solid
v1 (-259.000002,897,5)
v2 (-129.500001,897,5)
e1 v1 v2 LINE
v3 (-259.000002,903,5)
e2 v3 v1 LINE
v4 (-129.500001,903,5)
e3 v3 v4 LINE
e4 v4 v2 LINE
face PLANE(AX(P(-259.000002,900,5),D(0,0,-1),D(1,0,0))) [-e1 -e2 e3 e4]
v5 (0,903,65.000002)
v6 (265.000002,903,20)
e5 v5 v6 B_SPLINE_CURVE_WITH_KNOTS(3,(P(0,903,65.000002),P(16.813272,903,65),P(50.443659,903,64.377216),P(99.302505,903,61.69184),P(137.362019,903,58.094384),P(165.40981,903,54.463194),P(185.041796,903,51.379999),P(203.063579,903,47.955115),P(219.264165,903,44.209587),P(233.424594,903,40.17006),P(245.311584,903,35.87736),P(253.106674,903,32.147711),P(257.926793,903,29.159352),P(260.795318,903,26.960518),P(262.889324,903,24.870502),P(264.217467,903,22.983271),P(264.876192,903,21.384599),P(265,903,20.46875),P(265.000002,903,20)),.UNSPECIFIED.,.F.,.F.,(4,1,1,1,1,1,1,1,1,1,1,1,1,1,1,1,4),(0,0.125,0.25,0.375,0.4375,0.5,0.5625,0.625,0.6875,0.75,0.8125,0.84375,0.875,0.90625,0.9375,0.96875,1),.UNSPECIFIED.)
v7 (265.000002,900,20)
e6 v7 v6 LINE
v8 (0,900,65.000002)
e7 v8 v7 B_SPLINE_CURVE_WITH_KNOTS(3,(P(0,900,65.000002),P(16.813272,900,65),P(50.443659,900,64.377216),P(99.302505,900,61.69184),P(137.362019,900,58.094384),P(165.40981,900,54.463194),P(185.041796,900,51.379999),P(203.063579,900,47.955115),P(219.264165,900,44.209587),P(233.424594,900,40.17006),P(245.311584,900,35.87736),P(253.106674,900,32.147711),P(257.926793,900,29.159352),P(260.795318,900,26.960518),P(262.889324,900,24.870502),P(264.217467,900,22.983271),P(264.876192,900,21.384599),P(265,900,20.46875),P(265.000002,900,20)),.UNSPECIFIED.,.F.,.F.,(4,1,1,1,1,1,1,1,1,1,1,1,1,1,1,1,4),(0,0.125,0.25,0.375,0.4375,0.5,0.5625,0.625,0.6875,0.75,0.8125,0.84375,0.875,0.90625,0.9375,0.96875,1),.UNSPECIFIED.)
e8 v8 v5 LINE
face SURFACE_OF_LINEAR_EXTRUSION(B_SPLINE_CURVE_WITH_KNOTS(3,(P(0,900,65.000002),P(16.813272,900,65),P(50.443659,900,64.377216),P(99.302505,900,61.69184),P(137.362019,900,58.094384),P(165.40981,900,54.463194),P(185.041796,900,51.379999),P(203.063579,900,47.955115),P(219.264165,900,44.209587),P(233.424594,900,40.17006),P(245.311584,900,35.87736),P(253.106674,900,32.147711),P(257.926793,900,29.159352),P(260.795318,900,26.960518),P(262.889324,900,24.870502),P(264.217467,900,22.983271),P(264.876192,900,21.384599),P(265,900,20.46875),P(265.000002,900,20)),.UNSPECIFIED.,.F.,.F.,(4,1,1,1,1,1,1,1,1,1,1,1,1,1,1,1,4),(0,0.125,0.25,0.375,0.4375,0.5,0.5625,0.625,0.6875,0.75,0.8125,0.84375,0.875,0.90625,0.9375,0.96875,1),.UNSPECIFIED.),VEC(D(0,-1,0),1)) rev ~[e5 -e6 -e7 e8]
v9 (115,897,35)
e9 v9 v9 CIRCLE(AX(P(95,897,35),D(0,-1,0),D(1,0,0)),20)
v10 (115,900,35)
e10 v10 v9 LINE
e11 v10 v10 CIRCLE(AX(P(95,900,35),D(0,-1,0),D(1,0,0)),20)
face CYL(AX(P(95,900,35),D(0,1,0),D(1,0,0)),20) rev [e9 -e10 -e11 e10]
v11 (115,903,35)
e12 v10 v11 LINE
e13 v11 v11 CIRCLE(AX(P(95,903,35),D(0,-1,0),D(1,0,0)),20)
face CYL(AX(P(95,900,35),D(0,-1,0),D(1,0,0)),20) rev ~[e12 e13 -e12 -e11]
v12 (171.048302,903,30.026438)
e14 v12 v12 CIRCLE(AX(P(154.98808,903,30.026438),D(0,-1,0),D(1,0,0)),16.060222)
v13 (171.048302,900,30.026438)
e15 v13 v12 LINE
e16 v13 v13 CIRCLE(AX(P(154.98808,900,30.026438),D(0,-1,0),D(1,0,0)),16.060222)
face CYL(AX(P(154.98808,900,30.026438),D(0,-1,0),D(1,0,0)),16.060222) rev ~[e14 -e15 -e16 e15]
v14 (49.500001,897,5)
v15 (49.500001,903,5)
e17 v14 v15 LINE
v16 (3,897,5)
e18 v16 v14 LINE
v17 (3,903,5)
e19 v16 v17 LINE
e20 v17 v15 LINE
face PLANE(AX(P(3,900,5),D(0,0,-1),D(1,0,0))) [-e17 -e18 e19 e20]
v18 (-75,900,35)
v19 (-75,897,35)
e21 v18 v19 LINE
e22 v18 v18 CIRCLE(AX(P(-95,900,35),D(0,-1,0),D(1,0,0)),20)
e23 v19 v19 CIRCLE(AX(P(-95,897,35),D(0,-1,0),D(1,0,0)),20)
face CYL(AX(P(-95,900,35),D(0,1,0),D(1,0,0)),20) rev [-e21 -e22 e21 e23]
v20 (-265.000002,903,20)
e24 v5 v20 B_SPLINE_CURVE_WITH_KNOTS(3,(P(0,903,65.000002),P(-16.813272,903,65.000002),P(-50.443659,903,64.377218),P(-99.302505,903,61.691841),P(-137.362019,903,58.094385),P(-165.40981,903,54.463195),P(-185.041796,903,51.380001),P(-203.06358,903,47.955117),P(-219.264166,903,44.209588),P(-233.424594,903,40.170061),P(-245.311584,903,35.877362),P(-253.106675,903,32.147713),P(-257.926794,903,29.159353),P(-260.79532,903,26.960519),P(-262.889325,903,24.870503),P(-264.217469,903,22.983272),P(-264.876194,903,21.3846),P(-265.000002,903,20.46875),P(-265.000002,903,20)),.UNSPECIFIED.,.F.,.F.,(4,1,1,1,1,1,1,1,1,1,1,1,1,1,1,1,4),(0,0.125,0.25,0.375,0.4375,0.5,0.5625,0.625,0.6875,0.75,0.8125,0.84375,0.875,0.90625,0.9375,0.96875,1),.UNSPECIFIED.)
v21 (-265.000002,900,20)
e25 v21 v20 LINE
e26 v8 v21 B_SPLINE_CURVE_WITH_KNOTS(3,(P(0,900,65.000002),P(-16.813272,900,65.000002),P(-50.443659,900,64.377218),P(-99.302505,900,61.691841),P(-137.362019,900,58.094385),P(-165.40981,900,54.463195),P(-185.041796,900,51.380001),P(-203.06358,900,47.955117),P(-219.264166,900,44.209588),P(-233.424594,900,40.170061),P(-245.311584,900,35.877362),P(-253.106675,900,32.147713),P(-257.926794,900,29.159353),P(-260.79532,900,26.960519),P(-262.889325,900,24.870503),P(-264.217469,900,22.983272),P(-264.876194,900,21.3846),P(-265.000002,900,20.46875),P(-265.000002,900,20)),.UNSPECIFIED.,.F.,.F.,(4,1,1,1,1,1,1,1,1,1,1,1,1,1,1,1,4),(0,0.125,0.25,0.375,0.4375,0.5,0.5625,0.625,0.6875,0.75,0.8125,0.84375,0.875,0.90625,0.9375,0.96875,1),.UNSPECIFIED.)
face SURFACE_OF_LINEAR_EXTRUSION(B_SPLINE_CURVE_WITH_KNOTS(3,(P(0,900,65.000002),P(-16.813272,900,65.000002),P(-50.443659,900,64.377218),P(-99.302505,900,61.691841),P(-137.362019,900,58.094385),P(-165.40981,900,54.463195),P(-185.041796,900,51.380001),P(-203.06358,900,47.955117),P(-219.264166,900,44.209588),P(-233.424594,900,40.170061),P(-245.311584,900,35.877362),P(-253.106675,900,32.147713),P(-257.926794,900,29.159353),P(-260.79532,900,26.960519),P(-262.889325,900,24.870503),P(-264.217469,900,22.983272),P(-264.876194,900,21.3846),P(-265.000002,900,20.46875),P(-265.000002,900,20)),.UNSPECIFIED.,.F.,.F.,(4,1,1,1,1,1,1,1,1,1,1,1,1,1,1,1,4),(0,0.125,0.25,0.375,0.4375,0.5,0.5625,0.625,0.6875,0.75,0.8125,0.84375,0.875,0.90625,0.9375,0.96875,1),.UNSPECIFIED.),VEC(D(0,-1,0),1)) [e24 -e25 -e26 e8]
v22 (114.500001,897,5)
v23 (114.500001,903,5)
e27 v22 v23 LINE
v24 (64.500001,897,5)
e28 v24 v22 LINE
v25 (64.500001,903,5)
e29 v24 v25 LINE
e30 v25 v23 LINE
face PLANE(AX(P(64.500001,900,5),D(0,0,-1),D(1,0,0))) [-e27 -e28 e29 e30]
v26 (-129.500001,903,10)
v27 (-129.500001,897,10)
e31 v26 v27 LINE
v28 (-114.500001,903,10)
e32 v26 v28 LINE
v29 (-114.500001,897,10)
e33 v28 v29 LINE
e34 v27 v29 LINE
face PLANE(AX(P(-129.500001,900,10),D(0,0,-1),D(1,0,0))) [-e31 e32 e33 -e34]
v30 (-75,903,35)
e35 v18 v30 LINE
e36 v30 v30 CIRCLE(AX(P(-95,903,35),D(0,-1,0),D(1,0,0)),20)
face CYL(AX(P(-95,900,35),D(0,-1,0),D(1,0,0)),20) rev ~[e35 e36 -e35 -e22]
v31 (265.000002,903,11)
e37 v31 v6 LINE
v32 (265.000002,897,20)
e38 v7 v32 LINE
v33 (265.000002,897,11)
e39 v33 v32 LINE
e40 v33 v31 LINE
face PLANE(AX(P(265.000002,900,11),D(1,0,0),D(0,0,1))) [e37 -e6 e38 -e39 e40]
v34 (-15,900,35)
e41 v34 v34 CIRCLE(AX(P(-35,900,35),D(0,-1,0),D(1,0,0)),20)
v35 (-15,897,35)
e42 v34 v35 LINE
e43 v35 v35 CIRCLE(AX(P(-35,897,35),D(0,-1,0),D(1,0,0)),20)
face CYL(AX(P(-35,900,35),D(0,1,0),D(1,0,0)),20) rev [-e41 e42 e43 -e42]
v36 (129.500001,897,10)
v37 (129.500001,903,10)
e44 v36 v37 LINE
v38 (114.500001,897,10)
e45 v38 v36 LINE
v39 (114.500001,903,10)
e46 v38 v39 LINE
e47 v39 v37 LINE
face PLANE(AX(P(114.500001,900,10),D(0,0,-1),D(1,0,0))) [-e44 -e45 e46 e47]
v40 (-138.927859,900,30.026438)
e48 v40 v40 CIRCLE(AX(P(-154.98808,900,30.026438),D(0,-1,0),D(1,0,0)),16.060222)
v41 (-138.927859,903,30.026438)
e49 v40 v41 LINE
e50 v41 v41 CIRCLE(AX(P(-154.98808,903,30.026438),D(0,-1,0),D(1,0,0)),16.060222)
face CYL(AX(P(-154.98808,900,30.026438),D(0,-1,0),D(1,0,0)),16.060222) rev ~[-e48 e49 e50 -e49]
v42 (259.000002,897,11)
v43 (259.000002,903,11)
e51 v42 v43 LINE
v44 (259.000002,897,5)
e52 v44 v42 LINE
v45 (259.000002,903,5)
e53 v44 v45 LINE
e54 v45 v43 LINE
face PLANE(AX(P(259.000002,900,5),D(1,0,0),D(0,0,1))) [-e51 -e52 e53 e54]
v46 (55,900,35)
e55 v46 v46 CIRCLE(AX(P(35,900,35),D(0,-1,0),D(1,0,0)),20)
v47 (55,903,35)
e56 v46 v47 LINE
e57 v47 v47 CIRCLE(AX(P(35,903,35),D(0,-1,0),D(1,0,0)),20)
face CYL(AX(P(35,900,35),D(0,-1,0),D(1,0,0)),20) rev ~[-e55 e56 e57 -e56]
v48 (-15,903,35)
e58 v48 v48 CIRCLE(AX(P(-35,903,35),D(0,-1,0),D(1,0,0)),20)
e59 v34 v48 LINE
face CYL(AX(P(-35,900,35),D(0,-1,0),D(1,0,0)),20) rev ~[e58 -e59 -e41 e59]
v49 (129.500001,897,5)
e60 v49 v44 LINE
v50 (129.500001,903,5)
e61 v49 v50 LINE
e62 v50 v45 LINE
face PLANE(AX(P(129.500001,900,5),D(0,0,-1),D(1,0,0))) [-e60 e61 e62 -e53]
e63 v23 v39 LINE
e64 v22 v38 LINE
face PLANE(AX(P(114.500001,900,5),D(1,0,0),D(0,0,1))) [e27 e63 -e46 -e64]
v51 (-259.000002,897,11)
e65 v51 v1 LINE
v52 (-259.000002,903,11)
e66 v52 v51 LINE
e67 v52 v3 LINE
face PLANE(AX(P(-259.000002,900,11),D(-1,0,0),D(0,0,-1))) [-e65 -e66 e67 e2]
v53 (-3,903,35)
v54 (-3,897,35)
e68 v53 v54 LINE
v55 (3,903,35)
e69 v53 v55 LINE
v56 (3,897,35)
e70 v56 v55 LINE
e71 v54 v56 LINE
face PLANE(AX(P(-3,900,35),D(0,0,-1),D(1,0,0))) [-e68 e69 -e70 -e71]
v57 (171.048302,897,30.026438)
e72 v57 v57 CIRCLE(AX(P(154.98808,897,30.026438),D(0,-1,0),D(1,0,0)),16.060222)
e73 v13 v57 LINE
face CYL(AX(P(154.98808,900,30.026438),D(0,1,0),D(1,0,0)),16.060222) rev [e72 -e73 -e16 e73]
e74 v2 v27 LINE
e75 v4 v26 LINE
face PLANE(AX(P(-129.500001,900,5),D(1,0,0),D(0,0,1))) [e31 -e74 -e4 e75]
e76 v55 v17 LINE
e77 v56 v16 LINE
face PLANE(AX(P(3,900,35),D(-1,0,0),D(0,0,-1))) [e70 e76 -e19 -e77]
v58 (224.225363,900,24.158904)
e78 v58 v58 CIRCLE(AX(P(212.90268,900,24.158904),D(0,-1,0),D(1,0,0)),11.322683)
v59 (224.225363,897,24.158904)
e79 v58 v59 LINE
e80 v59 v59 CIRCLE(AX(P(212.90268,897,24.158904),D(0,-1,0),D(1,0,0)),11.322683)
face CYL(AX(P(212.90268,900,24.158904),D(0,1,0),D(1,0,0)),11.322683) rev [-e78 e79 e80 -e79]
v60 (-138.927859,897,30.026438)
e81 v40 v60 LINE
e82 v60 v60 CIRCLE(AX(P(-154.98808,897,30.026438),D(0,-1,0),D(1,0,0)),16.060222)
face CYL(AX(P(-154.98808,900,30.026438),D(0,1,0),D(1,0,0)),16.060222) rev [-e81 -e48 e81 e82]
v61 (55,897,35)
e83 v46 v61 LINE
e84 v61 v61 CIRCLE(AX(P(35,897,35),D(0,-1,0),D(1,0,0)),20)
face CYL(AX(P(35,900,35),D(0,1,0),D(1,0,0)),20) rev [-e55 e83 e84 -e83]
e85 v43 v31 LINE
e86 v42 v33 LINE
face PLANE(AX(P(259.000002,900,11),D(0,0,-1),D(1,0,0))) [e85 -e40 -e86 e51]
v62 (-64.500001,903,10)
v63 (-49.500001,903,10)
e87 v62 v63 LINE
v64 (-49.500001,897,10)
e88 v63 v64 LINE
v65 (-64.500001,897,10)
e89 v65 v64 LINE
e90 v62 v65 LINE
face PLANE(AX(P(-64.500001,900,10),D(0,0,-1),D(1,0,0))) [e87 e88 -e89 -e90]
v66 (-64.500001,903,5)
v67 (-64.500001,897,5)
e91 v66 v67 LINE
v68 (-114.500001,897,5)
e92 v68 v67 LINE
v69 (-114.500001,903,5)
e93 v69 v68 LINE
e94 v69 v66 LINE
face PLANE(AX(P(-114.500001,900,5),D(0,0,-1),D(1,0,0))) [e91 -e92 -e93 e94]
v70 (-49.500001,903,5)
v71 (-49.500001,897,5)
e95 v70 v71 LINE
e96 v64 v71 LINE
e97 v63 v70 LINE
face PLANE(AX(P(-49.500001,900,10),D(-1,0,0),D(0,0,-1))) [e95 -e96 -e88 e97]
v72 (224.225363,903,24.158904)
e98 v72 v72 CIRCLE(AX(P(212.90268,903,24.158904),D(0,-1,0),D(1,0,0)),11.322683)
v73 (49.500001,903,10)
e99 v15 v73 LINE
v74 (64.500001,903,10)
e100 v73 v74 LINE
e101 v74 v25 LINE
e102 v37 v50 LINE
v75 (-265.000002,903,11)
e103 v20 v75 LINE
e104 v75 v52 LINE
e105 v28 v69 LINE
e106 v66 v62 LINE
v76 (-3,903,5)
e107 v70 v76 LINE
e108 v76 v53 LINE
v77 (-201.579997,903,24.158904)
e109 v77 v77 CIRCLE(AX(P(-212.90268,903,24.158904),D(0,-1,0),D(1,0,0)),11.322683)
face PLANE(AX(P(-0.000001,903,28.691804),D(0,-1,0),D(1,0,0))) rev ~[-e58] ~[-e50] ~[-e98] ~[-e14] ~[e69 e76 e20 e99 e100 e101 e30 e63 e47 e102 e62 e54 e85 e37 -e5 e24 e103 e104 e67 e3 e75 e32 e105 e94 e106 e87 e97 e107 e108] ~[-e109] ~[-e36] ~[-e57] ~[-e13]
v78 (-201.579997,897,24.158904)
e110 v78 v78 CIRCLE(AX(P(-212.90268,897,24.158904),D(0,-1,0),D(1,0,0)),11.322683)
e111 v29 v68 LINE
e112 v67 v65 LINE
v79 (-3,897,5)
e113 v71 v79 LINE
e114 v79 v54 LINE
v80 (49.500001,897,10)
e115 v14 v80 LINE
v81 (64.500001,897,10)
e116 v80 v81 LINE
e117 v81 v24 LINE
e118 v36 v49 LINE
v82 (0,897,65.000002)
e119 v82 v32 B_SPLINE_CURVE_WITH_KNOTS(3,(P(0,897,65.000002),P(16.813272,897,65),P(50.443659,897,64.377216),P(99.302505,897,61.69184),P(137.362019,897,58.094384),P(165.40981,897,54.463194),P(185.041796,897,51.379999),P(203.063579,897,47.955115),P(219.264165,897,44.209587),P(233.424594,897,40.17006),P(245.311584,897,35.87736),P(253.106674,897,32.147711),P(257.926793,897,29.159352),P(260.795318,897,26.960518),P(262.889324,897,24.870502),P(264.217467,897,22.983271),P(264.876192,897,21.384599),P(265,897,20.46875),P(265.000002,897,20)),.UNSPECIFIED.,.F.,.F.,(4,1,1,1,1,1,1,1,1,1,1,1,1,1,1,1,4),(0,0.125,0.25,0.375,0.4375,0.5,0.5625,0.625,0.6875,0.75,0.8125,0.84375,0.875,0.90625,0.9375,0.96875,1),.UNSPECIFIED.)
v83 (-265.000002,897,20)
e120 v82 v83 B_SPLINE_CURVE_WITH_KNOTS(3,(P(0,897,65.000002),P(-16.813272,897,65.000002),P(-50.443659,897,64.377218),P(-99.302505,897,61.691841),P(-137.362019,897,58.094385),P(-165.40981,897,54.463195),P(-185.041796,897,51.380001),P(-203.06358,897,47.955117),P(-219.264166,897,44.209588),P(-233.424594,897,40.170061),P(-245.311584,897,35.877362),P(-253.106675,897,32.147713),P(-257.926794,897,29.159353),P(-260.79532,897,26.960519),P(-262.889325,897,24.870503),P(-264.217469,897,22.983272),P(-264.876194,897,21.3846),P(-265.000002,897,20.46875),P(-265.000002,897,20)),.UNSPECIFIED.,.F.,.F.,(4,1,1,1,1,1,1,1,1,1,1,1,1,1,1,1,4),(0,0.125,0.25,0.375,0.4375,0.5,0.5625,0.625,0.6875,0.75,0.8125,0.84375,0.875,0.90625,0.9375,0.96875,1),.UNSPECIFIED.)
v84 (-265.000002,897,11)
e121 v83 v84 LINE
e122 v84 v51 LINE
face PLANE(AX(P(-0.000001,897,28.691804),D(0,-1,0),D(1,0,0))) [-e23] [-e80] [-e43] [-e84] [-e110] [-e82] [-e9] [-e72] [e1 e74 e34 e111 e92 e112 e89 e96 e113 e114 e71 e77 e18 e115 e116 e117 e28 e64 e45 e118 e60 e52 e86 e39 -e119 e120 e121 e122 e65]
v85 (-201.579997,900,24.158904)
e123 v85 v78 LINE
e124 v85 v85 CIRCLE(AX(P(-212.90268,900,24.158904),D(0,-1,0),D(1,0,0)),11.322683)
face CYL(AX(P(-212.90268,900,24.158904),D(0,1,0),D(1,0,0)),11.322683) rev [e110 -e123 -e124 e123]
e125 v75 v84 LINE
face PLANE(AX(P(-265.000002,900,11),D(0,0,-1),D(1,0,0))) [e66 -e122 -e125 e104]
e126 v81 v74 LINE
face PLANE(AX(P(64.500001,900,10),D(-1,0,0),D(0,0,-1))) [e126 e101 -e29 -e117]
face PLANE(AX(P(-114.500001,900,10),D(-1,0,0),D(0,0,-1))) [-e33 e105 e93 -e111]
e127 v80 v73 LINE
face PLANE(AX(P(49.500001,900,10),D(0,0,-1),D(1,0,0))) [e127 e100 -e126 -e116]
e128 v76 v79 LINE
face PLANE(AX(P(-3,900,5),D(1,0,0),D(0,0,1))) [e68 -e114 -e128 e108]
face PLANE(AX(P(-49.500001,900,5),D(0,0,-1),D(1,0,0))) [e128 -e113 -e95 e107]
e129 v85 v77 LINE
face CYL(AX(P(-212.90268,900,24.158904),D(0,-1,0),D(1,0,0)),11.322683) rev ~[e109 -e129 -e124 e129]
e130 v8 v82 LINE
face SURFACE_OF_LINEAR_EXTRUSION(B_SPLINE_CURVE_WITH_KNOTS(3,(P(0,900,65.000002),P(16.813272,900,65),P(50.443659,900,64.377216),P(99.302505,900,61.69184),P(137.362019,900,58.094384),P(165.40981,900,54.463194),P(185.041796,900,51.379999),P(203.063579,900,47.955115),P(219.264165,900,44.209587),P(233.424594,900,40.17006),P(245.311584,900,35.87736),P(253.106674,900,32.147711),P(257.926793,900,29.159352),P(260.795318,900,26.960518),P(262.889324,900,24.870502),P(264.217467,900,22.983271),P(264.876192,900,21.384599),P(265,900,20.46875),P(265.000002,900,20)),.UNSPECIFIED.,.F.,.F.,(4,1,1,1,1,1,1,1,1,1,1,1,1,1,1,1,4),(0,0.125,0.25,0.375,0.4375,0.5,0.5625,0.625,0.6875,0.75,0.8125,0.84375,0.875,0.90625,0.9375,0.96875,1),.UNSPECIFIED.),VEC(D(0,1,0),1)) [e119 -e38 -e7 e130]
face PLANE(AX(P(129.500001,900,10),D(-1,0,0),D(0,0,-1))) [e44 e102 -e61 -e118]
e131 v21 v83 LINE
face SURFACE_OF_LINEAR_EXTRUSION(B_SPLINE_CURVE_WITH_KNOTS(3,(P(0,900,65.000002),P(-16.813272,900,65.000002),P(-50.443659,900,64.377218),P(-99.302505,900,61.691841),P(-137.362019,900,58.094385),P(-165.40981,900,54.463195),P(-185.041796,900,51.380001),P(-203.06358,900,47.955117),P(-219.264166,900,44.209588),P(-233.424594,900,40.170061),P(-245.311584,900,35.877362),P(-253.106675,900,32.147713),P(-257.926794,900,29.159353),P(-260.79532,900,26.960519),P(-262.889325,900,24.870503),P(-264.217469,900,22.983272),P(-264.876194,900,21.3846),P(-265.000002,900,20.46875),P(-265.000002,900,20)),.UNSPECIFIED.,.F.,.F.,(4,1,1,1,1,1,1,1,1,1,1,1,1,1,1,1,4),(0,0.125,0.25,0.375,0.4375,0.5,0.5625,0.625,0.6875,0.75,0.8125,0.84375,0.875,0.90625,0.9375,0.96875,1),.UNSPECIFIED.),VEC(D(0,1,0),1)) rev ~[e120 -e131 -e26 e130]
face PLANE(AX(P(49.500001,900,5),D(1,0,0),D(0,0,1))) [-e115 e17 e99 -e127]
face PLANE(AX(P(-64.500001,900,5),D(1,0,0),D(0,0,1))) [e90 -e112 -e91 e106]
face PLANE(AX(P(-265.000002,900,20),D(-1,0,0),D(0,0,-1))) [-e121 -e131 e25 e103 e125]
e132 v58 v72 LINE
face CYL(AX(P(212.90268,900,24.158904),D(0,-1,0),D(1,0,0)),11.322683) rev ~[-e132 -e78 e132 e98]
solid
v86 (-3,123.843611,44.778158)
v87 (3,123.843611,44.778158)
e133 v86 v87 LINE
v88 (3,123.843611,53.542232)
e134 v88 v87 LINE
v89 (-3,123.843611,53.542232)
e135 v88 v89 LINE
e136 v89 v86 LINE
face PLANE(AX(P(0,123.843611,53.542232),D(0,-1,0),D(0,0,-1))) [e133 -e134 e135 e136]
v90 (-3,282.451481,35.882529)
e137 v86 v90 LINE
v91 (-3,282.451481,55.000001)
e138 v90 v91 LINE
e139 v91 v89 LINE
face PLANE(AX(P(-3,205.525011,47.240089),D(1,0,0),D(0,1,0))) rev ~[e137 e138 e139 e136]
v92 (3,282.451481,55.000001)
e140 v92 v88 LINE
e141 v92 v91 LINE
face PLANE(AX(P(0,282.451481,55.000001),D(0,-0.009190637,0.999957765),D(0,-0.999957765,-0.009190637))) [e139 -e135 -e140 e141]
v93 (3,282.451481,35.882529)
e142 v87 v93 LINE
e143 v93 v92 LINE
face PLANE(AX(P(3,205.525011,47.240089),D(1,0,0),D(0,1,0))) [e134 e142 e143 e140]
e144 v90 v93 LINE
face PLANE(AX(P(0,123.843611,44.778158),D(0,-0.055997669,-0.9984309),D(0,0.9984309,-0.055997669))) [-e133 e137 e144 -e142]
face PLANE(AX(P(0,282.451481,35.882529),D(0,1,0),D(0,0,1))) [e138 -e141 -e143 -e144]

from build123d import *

# Parameters (mm, degrees)
F13_R     = 11.3226827756
F13_R_2   = 16.0602215827
F13_R_3   = 20
F14_DEPTH = 3
F16_DEPTH = 3


# Not quite as in the source:
# - ends of sketch curves that miss each other by under 0.0002 mm in the source are joined
# - the dataset's text gives a spline's control points without its knots; the knots are read off the source's solid


with BuildPart() as f14:
    # F13 (on plane+point) → F14 (new body, symmetric)
    with BuildSketch(Plane.XZ.offset(-900)):
        with BuildLine():
            add(Edge.make_bspline(
                [(0, 65.0000017214), (-16.8132716262, 65.0000017214), (-50.4436594842, 64.3772177187), (-99.3025047051, 61.6918414949), (-137.3620190284, 58.0943852226), (-165.4098100123, 54.4631954875), (-185.0417959114, 51.3800009944), (-203.0635795445, 47.9551169207), (-219.2641655203, 44.2095883028), (-233.4245941815, 40.1700613915), (-245.3115843014, 35.8773618028), (-253.1066747999, 32.1477127494), (-257.9267935516, 29.159352958), (-260.7953195745, 26.9605190172), (-262.8893252044, 24.8705031892), (-264.217468598, 22.9832715337), (-264.8761935592, 21.3845998162), (-265.0000017214, 20.4687501614), (-265.0000017214, 20)],
                knots=[0, 0, 0, 0, 0.125, 0.25, 0.375, 0.4375, 0.5, 0.5625, 0.625, 0.6875, 0.75, 0.8125, 0.84375, 0.875, 0.90625, 0.9375, 0.96875, 1, 1, 1, 1], degree=3))
            Line((-265.0000017214, 20), (-265.0000017214, 14))
            Line((-265.0000017214, 14), (-265.0000017214, 11))
            Line((-265.0000017214, 11), (-259.0000017214, 11))
            Line((-259.0000017214, 11), (-259.0000017214, 5))
            Line((-259.0000017214, 5), (-129.5000008607, 5))
            Line((-129.5000008607, 5), (-129.5000008607, 10))
            Line((-129.5000008607, 10), (-114.5000008607, 10))
            Line((-114.5000008607, 10), (-114.5000008607, 5))
            Line((-114.5000008607, 5), (-64.5000008607, 5))
            Line((-64.5000008607, 5), (-64.5000008607, 10))
            Line((-64.5000008607, 10), (-49.5000008607, 10))
            Line((-49.5000008607, 10), (-49.5000008607, 5))
            Line((-49.5000008607, 5), (-3, 5))
            Line((-3, 5), (-3, 35))
            Line((-3, 35), (0, 35))
            Line((0, 35), (3, 35))
            Line((3, 35), (3, 5))
            Line((3, 5), (49.5000008607, 5))
            Line((49.5000008607, 5), (49.5000008607, 10))
            Line((49.5000008607, 10), (64.5000008607, 10))
            Line((64.5000008607, 10), (64.5000008607, 5))
            Line((64.5000008607, 5), (114.5000008607, 5))
            Line((114.5000008607, 5), (114.5000008607, 10))
            Line((114.5000008607, 10), (129.5000008607, 10))
            Line((129.5000008607, 10), (129.5000008607, 5))
            Line((129.5000008607, 5), (259.0000017214, 5))
            Line((259.0000017214, 5), (259.0000017214, 11))
            Line((259.0000017214, 11), (265.0000017214, 11))
            Line((265.0000017214, 11), (265.0000017214, 14))
            Line((265.0000017214, 14), (265.0000017214, 20))
            add(Edge.make_bspline(
                [(0, 65.0000017214), (16.8132716049, 65), (50.4436594217, 64.377215998), (99.3025045792, 61.6918397777), (137.3620188431, 58.0943835108), (165.4098097701, 54.4631937831), (185.0417956199, 51.3799992976), (203.0635791939, 47.9551152349), (219.2641650964, 44.2095866337), (233.4245936626, 40.1700597488), (245.3115836539, 35.8773602052), (253.1066739993, 32.1477112211), (257.9267925836, 29.1593515313), (260.7953184537, 26.9605177048), (262.8893239024, 24.8705020511), (264.217467098, 22.9832706618), (264.876191886, 21.3845993314), (265, 20.46875), (265.0000017214, 20)],
                knots=[0, 0, 0, 0, 0.125, 0.25, 0.375, 0.4375, 0.5, 0.5625, 0.625, 0.6875, 0.75, 0.8125, 0.84375, 0.875, 0.90625, 0.9375, 0.96875, 1, 1, 1, 1], degree=3))
        make_face()
        with Locations((-212.9026800394, 24.1589043289)):
            Circle(F13_R, mode=Mode.SUBTRACT)
        with Locations((-154.9880802631, 30.0264377147)):
            Circle(F13_R_2, mode=Mode.SUBTRACT)
        with Locations((-95, 35)):
            Circle(F13_R_3, mode=Mode.SUBTRACT)
        with Locations((-35, 35)):
            Circle(F13_R_3, mode=Mode.SUBTRACT)
        with Locations((35, 35)):
            Circle(F13_R_3, mode=Mode.SUBTRACT)
        with Locations((95, 35)):
            Circle(F13_R_3, mode=Mode.SUBTRACT)
        with Locations((212.9026800394, 24.1589043289)):
            Circle(F13_R, mode=Mode.SUBTRACT)
        with Locations((154.9880802631, 30.0264377147)):
            Circle(F13_R_2, mode=Mode.SUBTRACT)
    extrude(amount=F14_DEPTH, both=True)


with BuildPart() as f16:
    # F15 (on Right) → F16 (new body, symmetric)
    with BuildSketch(Plane.YZ):
        Polygon((123.8436113754, 53.5422320686), (123.8436113754, 44.7781579091), (282.4514806271, 35.8825288713), (282.4514806271, 55.0000010676), align=None)
    extrude(amount=F16_DEPTH, both=True)


solid = Compound([f14.part, f16.part])
